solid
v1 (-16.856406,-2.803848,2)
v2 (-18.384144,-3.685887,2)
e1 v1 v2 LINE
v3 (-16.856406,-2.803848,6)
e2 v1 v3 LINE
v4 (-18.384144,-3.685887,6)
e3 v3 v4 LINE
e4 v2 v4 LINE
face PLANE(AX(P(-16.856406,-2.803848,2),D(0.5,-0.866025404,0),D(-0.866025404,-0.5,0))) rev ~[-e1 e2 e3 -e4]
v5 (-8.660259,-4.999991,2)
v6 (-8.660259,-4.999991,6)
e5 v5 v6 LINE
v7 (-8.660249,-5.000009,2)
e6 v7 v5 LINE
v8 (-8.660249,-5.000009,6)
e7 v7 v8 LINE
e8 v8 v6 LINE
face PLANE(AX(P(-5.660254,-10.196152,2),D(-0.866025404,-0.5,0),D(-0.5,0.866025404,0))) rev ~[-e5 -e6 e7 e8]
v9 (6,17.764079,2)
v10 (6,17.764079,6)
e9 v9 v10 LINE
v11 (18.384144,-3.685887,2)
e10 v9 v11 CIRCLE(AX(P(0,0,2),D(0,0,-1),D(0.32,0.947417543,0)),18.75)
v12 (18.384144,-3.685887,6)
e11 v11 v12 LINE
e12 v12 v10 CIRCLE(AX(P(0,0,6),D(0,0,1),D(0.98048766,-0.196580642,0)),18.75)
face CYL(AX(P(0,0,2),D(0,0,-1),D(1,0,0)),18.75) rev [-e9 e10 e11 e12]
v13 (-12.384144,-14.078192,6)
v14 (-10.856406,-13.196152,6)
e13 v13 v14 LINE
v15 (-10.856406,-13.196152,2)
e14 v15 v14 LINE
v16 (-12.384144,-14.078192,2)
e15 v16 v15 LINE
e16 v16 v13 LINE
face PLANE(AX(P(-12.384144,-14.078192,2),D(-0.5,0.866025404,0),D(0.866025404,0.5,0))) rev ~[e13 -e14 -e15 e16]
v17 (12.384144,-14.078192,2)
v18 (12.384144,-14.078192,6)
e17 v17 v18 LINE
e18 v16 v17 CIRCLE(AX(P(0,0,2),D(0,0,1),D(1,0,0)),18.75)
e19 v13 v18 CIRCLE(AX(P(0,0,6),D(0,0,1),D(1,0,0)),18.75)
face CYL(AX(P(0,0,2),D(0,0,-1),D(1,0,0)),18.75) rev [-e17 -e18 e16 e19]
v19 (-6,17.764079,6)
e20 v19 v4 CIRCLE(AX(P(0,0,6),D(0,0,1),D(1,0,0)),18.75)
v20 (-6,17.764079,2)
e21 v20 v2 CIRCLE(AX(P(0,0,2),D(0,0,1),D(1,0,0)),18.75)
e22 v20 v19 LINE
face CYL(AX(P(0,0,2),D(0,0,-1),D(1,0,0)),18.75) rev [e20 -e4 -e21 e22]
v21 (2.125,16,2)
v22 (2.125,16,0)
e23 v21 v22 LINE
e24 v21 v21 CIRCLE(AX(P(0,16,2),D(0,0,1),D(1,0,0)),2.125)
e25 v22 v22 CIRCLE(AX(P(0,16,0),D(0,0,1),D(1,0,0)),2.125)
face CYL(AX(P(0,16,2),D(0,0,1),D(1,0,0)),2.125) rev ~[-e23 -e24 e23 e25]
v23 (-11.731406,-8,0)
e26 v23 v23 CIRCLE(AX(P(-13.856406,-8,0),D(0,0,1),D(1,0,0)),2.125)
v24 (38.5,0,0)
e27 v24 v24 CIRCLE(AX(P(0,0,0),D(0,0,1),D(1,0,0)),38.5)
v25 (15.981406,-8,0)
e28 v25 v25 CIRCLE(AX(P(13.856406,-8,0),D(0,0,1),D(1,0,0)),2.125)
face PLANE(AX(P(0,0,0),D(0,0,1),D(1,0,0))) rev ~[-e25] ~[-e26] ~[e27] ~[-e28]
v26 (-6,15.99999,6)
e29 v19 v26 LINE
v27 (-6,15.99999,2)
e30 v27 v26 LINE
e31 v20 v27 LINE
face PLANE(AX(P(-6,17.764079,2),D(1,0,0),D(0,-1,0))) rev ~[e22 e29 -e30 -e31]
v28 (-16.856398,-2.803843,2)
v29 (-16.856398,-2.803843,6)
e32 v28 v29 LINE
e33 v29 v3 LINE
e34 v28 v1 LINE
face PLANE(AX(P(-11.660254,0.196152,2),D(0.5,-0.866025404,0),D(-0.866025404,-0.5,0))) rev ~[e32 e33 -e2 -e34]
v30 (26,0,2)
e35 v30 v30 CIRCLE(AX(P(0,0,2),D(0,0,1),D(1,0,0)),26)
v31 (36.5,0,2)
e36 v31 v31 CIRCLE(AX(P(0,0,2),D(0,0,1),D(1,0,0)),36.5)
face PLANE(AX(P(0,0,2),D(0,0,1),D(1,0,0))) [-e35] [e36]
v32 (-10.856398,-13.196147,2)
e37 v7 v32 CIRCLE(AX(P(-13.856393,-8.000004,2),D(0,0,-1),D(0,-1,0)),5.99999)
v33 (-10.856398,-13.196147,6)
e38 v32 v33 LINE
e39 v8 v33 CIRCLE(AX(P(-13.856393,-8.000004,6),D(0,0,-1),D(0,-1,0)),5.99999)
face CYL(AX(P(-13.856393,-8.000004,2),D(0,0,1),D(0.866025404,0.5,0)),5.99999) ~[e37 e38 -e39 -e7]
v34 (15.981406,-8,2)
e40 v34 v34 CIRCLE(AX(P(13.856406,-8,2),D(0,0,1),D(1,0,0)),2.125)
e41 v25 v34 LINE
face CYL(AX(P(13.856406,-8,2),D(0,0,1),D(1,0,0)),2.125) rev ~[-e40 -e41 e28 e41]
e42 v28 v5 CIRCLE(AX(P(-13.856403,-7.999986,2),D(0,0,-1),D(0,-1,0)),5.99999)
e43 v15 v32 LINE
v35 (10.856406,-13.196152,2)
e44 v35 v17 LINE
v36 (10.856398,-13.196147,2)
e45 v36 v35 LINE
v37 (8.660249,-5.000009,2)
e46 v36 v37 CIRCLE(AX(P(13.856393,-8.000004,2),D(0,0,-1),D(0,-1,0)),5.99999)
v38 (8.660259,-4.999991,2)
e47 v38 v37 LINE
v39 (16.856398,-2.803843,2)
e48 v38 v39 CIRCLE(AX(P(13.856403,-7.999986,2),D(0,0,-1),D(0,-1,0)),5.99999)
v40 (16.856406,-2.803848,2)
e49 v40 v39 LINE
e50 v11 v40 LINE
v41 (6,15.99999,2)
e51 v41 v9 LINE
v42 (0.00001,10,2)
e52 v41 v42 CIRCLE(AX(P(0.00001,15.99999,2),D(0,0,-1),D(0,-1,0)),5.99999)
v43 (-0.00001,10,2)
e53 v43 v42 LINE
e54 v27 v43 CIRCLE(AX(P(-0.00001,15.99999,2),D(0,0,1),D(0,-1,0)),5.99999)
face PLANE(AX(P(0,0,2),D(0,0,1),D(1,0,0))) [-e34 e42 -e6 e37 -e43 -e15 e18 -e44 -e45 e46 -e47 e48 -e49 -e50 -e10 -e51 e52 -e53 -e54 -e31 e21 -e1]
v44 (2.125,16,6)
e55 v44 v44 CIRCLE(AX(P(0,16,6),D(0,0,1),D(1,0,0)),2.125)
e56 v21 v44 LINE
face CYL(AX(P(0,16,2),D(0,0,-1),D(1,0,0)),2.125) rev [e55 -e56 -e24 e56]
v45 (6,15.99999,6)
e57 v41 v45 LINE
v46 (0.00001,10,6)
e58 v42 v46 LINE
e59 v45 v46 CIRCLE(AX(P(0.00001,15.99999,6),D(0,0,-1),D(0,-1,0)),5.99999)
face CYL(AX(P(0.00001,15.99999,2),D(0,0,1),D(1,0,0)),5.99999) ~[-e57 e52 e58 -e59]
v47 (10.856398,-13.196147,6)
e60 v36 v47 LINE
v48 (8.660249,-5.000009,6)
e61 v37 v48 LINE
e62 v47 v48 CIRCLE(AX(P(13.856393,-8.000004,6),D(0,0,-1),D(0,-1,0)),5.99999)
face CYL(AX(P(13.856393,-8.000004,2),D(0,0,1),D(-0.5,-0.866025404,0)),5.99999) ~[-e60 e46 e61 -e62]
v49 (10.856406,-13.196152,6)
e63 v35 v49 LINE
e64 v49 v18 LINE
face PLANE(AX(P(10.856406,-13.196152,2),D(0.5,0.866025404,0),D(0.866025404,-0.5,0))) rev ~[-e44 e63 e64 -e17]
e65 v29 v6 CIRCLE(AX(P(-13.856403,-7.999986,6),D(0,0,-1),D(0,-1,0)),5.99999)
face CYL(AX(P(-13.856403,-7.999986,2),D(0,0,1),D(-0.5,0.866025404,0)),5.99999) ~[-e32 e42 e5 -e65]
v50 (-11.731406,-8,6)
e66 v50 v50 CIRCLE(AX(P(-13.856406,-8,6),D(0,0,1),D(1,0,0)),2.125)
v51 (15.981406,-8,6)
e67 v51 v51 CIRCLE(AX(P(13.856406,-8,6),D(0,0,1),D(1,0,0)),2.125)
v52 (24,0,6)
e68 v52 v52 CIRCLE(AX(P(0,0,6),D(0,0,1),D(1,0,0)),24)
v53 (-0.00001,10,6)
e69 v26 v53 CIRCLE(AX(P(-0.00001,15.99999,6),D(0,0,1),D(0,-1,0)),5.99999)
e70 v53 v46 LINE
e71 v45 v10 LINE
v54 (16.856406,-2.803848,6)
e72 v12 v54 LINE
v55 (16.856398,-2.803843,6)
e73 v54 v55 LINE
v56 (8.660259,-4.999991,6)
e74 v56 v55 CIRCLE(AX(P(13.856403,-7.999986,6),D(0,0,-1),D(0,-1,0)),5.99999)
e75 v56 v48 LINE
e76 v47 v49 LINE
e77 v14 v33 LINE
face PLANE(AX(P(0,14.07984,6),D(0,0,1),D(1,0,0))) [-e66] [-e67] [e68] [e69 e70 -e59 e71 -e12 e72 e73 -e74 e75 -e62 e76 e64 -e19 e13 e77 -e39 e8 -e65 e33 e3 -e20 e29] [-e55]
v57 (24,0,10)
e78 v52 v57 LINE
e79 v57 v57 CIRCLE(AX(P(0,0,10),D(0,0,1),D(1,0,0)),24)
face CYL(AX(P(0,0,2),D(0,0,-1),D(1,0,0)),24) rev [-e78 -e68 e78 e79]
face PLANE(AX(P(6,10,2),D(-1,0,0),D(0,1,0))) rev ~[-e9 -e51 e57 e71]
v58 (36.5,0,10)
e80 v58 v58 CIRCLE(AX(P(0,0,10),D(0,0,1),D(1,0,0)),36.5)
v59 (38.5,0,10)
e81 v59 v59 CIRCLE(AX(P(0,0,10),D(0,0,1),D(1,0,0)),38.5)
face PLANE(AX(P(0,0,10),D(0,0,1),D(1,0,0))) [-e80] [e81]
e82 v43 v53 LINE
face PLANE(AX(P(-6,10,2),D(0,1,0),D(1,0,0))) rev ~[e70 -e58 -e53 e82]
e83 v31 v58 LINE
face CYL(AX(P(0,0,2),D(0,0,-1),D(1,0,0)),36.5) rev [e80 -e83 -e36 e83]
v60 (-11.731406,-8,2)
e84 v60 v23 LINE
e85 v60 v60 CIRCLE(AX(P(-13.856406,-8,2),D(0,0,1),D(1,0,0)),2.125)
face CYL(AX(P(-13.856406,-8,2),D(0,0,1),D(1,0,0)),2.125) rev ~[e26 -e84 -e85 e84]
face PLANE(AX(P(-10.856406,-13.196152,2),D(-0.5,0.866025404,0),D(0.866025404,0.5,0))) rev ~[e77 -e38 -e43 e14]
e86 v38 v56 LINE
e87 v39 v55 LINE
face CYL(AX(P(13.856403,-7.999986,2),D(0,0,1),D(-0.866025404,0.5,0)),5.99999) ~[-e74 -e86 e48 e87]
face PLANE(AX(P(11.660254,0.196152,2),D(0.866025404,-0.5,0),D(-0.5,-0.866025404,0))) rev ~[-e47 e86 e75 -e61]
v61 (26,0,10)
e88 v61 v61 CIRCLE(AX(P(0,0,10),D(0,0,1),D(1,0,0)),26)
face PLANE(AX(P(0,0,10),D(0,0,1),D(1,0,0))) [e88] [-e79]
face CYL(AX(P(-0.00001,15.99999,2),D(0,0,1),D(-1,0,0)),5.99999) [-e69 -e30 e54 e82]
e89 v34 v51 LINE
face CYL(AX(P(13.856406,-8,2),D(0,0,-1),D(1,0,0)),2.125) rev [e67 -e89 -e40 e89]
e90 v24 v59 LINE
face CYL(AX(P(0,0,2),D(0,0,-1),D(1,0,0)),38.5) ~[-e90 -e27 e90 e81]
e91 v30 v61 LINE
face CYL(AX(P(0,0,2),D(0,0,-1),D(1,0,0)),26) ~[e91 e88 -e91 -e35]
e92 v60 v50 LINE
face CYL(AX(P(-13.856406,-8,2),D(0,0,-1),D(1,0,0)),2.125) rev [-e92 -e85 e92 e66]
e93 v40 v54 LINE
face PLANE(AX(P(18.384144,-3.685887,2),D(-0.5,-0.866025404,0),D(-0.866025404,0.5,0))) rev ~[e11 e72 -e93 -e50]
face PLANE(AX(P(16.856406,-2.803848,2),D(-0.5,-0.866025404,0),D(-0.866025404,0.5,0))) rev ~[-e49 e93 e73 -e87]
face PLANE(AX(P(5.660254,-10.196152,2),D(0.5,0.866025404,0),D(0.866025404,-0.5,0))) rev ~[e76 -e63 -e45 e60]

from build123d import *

# Parameters (mm, degrees)
F0_R      = 38.5
F1_DEPTH  = 2
F2_R      = 38.5
F2_R_2    = 36.5
F3_DEPTH  = 8
F4_R      = 26
F4_R_2    = 24
F5_DEPTH  = 8
F6_R      = 24
F6_R_2    = 18.75
F7_DEPTH  = 4
F8_R      = 2.125
F9_DEPTH  = 12.5
F10_R     = 2.125
F11_DEPTH = 4
F12_R     = 5.99999


# Not quite as in the source:
# - a fillet or chamfer is up to 0.001 mm smaller than in the source, because OpenCascade refuses the exact size


with BuildPart() as f1:
    # F0 (on Top) → F1 (new body)
    with BuildSketch(Plane.XY):
        Circle(F0_R)
    extrude(amount=F1_DEPTH)

    # F2 (on face) → F3 (join)
    with BuildSketch(Plane.XY.offset(2)):
        Circle(F2_R)
        Circle(F2_R_2, mode=Mode.SUBTRACT)
    extrude(amount=F3_DEPTH)

    # F4 (on face) → F5 (join)
    with BuildSketch(Plane.XY.offset(2)):
        Circle(F4_R)
        Circle(F4_R_2, mode=Mode.SUBTRACT)
    extrude(amount=F5_DEPTH)

    # F6 (on face) → F7 (join)
    with BuildSketch(Plane.XY.offset(2)):
        Circle(F6_R)
        Circle(F6_R_2, mode=Mode.SUBTRACT)
    extrude(amount=F7_DEPTH)

    # F8 (on face) → F9 (cut, symmetric)
    with BuildSketch(Plane.XY.offset(2)):
        with Locations((0, 16)):
            Circle(F8_R)
        with Locations((-13.8564064606, -8)):
            Circle(F8_R)
        with Locations((13.8564064606, -8)):
            Circle(F8_R)
    extrude(amount=F9_DEPTH, both=True, mode=Mode.SUBTRACT)

    # F10 (on face) → F11 (join)
    with BuildSketch(Plane.XY.offset(2)):
        with BuildLine():
            Line((6, 16), (6, 17.7640789235))
            ThreePointArc((6, 17.7640789235), (0, 18.75), (-6, 17.7640789235))
            Line((-6, 17.7640789235), (-6, 16))
            Line((-6, 16), (-6, 10))
            Line((-6, 10), (0, 10))
            Line((0, 10), (6, 10))
            Line((6, 10), (6, 16))
        make_face()
        with Locations((0, 16)):
            Circle(F10_R, mode=Mode.SUBTRACT)
        with BuildLine():
            Line((-16.8564064606, -2.8038475773), (-18.3841436226, -3.685887039))
            ThreePointArc((-18.3841436226, -3.685887039), (-16.237976321, -9.375), (-12.3841436226, -14.0781918845))
            Line((-12.3841436226, -14.0781918845), (-10.8564064606, -13.1961524227))
            Line((-10.8564064606, -13.1961524227), (-5.6602540378, -10.1961524227))
            Line((-5.6602540378, -10.1961524227), (-8.6602540378, -5))
            Line((-8.6602540378, -5), (-11.6602540378, 0.1961524227))
            Line((-11.6602540378, 0.1961524227), (-16.8564064606, -2.8038475773))
        make_face()
        with Locations((-13.8564064606, -8)):
            Circle(F10_R, mode=Mode.SUBTRACT)
        with BuildLine():
            ThreePointArc((12.3841436226, -14.0781918845), (16.237976321, -9.375), (18.3841436226, -3.685887039))
            Line((18.3841436226, -3.685887039), (16.8564064606, -2.8038475773))
            Line((16.8564064606, -2.8038475773), (11.6602540378, 0.1961524227))
            Line((11.6602540378, 0.1961524227), (8.6602540378, -5))
            Line((8.6602540378, -5), (5.6602540378, -10.1961524227))
            Line((5.6602540378, -10.1961524227), (10.8564064606, -13.1961524227))
            Line((10.8564064606, -13.1961524227), (12.3841436226, -14.0781918845))
        make_face()
        with Locations((13.8564064606, -8)):
            Circle(F10_R, mode=Mode.SUBTRACT)
    extrude(amount=F11_DEPTH)

    # F12 (radius 6 in the source; OpenCascade refuses exactly that, so slightly less here)
    f12_edges = [f1.edges().sort_by_distance(p)[0] for p in [
        (-6, 10, 4),
        (6, 10, 4),
        (11.660254, 0.196152, 4),
        (5.660254, -10.196152, 4),
        (-5.660254, -10.196152, 4),
        (-11.660254, 0.196152, 4),
    ]]
    fillet(f12_edges, radius=F12_R)


solid = f1.part
